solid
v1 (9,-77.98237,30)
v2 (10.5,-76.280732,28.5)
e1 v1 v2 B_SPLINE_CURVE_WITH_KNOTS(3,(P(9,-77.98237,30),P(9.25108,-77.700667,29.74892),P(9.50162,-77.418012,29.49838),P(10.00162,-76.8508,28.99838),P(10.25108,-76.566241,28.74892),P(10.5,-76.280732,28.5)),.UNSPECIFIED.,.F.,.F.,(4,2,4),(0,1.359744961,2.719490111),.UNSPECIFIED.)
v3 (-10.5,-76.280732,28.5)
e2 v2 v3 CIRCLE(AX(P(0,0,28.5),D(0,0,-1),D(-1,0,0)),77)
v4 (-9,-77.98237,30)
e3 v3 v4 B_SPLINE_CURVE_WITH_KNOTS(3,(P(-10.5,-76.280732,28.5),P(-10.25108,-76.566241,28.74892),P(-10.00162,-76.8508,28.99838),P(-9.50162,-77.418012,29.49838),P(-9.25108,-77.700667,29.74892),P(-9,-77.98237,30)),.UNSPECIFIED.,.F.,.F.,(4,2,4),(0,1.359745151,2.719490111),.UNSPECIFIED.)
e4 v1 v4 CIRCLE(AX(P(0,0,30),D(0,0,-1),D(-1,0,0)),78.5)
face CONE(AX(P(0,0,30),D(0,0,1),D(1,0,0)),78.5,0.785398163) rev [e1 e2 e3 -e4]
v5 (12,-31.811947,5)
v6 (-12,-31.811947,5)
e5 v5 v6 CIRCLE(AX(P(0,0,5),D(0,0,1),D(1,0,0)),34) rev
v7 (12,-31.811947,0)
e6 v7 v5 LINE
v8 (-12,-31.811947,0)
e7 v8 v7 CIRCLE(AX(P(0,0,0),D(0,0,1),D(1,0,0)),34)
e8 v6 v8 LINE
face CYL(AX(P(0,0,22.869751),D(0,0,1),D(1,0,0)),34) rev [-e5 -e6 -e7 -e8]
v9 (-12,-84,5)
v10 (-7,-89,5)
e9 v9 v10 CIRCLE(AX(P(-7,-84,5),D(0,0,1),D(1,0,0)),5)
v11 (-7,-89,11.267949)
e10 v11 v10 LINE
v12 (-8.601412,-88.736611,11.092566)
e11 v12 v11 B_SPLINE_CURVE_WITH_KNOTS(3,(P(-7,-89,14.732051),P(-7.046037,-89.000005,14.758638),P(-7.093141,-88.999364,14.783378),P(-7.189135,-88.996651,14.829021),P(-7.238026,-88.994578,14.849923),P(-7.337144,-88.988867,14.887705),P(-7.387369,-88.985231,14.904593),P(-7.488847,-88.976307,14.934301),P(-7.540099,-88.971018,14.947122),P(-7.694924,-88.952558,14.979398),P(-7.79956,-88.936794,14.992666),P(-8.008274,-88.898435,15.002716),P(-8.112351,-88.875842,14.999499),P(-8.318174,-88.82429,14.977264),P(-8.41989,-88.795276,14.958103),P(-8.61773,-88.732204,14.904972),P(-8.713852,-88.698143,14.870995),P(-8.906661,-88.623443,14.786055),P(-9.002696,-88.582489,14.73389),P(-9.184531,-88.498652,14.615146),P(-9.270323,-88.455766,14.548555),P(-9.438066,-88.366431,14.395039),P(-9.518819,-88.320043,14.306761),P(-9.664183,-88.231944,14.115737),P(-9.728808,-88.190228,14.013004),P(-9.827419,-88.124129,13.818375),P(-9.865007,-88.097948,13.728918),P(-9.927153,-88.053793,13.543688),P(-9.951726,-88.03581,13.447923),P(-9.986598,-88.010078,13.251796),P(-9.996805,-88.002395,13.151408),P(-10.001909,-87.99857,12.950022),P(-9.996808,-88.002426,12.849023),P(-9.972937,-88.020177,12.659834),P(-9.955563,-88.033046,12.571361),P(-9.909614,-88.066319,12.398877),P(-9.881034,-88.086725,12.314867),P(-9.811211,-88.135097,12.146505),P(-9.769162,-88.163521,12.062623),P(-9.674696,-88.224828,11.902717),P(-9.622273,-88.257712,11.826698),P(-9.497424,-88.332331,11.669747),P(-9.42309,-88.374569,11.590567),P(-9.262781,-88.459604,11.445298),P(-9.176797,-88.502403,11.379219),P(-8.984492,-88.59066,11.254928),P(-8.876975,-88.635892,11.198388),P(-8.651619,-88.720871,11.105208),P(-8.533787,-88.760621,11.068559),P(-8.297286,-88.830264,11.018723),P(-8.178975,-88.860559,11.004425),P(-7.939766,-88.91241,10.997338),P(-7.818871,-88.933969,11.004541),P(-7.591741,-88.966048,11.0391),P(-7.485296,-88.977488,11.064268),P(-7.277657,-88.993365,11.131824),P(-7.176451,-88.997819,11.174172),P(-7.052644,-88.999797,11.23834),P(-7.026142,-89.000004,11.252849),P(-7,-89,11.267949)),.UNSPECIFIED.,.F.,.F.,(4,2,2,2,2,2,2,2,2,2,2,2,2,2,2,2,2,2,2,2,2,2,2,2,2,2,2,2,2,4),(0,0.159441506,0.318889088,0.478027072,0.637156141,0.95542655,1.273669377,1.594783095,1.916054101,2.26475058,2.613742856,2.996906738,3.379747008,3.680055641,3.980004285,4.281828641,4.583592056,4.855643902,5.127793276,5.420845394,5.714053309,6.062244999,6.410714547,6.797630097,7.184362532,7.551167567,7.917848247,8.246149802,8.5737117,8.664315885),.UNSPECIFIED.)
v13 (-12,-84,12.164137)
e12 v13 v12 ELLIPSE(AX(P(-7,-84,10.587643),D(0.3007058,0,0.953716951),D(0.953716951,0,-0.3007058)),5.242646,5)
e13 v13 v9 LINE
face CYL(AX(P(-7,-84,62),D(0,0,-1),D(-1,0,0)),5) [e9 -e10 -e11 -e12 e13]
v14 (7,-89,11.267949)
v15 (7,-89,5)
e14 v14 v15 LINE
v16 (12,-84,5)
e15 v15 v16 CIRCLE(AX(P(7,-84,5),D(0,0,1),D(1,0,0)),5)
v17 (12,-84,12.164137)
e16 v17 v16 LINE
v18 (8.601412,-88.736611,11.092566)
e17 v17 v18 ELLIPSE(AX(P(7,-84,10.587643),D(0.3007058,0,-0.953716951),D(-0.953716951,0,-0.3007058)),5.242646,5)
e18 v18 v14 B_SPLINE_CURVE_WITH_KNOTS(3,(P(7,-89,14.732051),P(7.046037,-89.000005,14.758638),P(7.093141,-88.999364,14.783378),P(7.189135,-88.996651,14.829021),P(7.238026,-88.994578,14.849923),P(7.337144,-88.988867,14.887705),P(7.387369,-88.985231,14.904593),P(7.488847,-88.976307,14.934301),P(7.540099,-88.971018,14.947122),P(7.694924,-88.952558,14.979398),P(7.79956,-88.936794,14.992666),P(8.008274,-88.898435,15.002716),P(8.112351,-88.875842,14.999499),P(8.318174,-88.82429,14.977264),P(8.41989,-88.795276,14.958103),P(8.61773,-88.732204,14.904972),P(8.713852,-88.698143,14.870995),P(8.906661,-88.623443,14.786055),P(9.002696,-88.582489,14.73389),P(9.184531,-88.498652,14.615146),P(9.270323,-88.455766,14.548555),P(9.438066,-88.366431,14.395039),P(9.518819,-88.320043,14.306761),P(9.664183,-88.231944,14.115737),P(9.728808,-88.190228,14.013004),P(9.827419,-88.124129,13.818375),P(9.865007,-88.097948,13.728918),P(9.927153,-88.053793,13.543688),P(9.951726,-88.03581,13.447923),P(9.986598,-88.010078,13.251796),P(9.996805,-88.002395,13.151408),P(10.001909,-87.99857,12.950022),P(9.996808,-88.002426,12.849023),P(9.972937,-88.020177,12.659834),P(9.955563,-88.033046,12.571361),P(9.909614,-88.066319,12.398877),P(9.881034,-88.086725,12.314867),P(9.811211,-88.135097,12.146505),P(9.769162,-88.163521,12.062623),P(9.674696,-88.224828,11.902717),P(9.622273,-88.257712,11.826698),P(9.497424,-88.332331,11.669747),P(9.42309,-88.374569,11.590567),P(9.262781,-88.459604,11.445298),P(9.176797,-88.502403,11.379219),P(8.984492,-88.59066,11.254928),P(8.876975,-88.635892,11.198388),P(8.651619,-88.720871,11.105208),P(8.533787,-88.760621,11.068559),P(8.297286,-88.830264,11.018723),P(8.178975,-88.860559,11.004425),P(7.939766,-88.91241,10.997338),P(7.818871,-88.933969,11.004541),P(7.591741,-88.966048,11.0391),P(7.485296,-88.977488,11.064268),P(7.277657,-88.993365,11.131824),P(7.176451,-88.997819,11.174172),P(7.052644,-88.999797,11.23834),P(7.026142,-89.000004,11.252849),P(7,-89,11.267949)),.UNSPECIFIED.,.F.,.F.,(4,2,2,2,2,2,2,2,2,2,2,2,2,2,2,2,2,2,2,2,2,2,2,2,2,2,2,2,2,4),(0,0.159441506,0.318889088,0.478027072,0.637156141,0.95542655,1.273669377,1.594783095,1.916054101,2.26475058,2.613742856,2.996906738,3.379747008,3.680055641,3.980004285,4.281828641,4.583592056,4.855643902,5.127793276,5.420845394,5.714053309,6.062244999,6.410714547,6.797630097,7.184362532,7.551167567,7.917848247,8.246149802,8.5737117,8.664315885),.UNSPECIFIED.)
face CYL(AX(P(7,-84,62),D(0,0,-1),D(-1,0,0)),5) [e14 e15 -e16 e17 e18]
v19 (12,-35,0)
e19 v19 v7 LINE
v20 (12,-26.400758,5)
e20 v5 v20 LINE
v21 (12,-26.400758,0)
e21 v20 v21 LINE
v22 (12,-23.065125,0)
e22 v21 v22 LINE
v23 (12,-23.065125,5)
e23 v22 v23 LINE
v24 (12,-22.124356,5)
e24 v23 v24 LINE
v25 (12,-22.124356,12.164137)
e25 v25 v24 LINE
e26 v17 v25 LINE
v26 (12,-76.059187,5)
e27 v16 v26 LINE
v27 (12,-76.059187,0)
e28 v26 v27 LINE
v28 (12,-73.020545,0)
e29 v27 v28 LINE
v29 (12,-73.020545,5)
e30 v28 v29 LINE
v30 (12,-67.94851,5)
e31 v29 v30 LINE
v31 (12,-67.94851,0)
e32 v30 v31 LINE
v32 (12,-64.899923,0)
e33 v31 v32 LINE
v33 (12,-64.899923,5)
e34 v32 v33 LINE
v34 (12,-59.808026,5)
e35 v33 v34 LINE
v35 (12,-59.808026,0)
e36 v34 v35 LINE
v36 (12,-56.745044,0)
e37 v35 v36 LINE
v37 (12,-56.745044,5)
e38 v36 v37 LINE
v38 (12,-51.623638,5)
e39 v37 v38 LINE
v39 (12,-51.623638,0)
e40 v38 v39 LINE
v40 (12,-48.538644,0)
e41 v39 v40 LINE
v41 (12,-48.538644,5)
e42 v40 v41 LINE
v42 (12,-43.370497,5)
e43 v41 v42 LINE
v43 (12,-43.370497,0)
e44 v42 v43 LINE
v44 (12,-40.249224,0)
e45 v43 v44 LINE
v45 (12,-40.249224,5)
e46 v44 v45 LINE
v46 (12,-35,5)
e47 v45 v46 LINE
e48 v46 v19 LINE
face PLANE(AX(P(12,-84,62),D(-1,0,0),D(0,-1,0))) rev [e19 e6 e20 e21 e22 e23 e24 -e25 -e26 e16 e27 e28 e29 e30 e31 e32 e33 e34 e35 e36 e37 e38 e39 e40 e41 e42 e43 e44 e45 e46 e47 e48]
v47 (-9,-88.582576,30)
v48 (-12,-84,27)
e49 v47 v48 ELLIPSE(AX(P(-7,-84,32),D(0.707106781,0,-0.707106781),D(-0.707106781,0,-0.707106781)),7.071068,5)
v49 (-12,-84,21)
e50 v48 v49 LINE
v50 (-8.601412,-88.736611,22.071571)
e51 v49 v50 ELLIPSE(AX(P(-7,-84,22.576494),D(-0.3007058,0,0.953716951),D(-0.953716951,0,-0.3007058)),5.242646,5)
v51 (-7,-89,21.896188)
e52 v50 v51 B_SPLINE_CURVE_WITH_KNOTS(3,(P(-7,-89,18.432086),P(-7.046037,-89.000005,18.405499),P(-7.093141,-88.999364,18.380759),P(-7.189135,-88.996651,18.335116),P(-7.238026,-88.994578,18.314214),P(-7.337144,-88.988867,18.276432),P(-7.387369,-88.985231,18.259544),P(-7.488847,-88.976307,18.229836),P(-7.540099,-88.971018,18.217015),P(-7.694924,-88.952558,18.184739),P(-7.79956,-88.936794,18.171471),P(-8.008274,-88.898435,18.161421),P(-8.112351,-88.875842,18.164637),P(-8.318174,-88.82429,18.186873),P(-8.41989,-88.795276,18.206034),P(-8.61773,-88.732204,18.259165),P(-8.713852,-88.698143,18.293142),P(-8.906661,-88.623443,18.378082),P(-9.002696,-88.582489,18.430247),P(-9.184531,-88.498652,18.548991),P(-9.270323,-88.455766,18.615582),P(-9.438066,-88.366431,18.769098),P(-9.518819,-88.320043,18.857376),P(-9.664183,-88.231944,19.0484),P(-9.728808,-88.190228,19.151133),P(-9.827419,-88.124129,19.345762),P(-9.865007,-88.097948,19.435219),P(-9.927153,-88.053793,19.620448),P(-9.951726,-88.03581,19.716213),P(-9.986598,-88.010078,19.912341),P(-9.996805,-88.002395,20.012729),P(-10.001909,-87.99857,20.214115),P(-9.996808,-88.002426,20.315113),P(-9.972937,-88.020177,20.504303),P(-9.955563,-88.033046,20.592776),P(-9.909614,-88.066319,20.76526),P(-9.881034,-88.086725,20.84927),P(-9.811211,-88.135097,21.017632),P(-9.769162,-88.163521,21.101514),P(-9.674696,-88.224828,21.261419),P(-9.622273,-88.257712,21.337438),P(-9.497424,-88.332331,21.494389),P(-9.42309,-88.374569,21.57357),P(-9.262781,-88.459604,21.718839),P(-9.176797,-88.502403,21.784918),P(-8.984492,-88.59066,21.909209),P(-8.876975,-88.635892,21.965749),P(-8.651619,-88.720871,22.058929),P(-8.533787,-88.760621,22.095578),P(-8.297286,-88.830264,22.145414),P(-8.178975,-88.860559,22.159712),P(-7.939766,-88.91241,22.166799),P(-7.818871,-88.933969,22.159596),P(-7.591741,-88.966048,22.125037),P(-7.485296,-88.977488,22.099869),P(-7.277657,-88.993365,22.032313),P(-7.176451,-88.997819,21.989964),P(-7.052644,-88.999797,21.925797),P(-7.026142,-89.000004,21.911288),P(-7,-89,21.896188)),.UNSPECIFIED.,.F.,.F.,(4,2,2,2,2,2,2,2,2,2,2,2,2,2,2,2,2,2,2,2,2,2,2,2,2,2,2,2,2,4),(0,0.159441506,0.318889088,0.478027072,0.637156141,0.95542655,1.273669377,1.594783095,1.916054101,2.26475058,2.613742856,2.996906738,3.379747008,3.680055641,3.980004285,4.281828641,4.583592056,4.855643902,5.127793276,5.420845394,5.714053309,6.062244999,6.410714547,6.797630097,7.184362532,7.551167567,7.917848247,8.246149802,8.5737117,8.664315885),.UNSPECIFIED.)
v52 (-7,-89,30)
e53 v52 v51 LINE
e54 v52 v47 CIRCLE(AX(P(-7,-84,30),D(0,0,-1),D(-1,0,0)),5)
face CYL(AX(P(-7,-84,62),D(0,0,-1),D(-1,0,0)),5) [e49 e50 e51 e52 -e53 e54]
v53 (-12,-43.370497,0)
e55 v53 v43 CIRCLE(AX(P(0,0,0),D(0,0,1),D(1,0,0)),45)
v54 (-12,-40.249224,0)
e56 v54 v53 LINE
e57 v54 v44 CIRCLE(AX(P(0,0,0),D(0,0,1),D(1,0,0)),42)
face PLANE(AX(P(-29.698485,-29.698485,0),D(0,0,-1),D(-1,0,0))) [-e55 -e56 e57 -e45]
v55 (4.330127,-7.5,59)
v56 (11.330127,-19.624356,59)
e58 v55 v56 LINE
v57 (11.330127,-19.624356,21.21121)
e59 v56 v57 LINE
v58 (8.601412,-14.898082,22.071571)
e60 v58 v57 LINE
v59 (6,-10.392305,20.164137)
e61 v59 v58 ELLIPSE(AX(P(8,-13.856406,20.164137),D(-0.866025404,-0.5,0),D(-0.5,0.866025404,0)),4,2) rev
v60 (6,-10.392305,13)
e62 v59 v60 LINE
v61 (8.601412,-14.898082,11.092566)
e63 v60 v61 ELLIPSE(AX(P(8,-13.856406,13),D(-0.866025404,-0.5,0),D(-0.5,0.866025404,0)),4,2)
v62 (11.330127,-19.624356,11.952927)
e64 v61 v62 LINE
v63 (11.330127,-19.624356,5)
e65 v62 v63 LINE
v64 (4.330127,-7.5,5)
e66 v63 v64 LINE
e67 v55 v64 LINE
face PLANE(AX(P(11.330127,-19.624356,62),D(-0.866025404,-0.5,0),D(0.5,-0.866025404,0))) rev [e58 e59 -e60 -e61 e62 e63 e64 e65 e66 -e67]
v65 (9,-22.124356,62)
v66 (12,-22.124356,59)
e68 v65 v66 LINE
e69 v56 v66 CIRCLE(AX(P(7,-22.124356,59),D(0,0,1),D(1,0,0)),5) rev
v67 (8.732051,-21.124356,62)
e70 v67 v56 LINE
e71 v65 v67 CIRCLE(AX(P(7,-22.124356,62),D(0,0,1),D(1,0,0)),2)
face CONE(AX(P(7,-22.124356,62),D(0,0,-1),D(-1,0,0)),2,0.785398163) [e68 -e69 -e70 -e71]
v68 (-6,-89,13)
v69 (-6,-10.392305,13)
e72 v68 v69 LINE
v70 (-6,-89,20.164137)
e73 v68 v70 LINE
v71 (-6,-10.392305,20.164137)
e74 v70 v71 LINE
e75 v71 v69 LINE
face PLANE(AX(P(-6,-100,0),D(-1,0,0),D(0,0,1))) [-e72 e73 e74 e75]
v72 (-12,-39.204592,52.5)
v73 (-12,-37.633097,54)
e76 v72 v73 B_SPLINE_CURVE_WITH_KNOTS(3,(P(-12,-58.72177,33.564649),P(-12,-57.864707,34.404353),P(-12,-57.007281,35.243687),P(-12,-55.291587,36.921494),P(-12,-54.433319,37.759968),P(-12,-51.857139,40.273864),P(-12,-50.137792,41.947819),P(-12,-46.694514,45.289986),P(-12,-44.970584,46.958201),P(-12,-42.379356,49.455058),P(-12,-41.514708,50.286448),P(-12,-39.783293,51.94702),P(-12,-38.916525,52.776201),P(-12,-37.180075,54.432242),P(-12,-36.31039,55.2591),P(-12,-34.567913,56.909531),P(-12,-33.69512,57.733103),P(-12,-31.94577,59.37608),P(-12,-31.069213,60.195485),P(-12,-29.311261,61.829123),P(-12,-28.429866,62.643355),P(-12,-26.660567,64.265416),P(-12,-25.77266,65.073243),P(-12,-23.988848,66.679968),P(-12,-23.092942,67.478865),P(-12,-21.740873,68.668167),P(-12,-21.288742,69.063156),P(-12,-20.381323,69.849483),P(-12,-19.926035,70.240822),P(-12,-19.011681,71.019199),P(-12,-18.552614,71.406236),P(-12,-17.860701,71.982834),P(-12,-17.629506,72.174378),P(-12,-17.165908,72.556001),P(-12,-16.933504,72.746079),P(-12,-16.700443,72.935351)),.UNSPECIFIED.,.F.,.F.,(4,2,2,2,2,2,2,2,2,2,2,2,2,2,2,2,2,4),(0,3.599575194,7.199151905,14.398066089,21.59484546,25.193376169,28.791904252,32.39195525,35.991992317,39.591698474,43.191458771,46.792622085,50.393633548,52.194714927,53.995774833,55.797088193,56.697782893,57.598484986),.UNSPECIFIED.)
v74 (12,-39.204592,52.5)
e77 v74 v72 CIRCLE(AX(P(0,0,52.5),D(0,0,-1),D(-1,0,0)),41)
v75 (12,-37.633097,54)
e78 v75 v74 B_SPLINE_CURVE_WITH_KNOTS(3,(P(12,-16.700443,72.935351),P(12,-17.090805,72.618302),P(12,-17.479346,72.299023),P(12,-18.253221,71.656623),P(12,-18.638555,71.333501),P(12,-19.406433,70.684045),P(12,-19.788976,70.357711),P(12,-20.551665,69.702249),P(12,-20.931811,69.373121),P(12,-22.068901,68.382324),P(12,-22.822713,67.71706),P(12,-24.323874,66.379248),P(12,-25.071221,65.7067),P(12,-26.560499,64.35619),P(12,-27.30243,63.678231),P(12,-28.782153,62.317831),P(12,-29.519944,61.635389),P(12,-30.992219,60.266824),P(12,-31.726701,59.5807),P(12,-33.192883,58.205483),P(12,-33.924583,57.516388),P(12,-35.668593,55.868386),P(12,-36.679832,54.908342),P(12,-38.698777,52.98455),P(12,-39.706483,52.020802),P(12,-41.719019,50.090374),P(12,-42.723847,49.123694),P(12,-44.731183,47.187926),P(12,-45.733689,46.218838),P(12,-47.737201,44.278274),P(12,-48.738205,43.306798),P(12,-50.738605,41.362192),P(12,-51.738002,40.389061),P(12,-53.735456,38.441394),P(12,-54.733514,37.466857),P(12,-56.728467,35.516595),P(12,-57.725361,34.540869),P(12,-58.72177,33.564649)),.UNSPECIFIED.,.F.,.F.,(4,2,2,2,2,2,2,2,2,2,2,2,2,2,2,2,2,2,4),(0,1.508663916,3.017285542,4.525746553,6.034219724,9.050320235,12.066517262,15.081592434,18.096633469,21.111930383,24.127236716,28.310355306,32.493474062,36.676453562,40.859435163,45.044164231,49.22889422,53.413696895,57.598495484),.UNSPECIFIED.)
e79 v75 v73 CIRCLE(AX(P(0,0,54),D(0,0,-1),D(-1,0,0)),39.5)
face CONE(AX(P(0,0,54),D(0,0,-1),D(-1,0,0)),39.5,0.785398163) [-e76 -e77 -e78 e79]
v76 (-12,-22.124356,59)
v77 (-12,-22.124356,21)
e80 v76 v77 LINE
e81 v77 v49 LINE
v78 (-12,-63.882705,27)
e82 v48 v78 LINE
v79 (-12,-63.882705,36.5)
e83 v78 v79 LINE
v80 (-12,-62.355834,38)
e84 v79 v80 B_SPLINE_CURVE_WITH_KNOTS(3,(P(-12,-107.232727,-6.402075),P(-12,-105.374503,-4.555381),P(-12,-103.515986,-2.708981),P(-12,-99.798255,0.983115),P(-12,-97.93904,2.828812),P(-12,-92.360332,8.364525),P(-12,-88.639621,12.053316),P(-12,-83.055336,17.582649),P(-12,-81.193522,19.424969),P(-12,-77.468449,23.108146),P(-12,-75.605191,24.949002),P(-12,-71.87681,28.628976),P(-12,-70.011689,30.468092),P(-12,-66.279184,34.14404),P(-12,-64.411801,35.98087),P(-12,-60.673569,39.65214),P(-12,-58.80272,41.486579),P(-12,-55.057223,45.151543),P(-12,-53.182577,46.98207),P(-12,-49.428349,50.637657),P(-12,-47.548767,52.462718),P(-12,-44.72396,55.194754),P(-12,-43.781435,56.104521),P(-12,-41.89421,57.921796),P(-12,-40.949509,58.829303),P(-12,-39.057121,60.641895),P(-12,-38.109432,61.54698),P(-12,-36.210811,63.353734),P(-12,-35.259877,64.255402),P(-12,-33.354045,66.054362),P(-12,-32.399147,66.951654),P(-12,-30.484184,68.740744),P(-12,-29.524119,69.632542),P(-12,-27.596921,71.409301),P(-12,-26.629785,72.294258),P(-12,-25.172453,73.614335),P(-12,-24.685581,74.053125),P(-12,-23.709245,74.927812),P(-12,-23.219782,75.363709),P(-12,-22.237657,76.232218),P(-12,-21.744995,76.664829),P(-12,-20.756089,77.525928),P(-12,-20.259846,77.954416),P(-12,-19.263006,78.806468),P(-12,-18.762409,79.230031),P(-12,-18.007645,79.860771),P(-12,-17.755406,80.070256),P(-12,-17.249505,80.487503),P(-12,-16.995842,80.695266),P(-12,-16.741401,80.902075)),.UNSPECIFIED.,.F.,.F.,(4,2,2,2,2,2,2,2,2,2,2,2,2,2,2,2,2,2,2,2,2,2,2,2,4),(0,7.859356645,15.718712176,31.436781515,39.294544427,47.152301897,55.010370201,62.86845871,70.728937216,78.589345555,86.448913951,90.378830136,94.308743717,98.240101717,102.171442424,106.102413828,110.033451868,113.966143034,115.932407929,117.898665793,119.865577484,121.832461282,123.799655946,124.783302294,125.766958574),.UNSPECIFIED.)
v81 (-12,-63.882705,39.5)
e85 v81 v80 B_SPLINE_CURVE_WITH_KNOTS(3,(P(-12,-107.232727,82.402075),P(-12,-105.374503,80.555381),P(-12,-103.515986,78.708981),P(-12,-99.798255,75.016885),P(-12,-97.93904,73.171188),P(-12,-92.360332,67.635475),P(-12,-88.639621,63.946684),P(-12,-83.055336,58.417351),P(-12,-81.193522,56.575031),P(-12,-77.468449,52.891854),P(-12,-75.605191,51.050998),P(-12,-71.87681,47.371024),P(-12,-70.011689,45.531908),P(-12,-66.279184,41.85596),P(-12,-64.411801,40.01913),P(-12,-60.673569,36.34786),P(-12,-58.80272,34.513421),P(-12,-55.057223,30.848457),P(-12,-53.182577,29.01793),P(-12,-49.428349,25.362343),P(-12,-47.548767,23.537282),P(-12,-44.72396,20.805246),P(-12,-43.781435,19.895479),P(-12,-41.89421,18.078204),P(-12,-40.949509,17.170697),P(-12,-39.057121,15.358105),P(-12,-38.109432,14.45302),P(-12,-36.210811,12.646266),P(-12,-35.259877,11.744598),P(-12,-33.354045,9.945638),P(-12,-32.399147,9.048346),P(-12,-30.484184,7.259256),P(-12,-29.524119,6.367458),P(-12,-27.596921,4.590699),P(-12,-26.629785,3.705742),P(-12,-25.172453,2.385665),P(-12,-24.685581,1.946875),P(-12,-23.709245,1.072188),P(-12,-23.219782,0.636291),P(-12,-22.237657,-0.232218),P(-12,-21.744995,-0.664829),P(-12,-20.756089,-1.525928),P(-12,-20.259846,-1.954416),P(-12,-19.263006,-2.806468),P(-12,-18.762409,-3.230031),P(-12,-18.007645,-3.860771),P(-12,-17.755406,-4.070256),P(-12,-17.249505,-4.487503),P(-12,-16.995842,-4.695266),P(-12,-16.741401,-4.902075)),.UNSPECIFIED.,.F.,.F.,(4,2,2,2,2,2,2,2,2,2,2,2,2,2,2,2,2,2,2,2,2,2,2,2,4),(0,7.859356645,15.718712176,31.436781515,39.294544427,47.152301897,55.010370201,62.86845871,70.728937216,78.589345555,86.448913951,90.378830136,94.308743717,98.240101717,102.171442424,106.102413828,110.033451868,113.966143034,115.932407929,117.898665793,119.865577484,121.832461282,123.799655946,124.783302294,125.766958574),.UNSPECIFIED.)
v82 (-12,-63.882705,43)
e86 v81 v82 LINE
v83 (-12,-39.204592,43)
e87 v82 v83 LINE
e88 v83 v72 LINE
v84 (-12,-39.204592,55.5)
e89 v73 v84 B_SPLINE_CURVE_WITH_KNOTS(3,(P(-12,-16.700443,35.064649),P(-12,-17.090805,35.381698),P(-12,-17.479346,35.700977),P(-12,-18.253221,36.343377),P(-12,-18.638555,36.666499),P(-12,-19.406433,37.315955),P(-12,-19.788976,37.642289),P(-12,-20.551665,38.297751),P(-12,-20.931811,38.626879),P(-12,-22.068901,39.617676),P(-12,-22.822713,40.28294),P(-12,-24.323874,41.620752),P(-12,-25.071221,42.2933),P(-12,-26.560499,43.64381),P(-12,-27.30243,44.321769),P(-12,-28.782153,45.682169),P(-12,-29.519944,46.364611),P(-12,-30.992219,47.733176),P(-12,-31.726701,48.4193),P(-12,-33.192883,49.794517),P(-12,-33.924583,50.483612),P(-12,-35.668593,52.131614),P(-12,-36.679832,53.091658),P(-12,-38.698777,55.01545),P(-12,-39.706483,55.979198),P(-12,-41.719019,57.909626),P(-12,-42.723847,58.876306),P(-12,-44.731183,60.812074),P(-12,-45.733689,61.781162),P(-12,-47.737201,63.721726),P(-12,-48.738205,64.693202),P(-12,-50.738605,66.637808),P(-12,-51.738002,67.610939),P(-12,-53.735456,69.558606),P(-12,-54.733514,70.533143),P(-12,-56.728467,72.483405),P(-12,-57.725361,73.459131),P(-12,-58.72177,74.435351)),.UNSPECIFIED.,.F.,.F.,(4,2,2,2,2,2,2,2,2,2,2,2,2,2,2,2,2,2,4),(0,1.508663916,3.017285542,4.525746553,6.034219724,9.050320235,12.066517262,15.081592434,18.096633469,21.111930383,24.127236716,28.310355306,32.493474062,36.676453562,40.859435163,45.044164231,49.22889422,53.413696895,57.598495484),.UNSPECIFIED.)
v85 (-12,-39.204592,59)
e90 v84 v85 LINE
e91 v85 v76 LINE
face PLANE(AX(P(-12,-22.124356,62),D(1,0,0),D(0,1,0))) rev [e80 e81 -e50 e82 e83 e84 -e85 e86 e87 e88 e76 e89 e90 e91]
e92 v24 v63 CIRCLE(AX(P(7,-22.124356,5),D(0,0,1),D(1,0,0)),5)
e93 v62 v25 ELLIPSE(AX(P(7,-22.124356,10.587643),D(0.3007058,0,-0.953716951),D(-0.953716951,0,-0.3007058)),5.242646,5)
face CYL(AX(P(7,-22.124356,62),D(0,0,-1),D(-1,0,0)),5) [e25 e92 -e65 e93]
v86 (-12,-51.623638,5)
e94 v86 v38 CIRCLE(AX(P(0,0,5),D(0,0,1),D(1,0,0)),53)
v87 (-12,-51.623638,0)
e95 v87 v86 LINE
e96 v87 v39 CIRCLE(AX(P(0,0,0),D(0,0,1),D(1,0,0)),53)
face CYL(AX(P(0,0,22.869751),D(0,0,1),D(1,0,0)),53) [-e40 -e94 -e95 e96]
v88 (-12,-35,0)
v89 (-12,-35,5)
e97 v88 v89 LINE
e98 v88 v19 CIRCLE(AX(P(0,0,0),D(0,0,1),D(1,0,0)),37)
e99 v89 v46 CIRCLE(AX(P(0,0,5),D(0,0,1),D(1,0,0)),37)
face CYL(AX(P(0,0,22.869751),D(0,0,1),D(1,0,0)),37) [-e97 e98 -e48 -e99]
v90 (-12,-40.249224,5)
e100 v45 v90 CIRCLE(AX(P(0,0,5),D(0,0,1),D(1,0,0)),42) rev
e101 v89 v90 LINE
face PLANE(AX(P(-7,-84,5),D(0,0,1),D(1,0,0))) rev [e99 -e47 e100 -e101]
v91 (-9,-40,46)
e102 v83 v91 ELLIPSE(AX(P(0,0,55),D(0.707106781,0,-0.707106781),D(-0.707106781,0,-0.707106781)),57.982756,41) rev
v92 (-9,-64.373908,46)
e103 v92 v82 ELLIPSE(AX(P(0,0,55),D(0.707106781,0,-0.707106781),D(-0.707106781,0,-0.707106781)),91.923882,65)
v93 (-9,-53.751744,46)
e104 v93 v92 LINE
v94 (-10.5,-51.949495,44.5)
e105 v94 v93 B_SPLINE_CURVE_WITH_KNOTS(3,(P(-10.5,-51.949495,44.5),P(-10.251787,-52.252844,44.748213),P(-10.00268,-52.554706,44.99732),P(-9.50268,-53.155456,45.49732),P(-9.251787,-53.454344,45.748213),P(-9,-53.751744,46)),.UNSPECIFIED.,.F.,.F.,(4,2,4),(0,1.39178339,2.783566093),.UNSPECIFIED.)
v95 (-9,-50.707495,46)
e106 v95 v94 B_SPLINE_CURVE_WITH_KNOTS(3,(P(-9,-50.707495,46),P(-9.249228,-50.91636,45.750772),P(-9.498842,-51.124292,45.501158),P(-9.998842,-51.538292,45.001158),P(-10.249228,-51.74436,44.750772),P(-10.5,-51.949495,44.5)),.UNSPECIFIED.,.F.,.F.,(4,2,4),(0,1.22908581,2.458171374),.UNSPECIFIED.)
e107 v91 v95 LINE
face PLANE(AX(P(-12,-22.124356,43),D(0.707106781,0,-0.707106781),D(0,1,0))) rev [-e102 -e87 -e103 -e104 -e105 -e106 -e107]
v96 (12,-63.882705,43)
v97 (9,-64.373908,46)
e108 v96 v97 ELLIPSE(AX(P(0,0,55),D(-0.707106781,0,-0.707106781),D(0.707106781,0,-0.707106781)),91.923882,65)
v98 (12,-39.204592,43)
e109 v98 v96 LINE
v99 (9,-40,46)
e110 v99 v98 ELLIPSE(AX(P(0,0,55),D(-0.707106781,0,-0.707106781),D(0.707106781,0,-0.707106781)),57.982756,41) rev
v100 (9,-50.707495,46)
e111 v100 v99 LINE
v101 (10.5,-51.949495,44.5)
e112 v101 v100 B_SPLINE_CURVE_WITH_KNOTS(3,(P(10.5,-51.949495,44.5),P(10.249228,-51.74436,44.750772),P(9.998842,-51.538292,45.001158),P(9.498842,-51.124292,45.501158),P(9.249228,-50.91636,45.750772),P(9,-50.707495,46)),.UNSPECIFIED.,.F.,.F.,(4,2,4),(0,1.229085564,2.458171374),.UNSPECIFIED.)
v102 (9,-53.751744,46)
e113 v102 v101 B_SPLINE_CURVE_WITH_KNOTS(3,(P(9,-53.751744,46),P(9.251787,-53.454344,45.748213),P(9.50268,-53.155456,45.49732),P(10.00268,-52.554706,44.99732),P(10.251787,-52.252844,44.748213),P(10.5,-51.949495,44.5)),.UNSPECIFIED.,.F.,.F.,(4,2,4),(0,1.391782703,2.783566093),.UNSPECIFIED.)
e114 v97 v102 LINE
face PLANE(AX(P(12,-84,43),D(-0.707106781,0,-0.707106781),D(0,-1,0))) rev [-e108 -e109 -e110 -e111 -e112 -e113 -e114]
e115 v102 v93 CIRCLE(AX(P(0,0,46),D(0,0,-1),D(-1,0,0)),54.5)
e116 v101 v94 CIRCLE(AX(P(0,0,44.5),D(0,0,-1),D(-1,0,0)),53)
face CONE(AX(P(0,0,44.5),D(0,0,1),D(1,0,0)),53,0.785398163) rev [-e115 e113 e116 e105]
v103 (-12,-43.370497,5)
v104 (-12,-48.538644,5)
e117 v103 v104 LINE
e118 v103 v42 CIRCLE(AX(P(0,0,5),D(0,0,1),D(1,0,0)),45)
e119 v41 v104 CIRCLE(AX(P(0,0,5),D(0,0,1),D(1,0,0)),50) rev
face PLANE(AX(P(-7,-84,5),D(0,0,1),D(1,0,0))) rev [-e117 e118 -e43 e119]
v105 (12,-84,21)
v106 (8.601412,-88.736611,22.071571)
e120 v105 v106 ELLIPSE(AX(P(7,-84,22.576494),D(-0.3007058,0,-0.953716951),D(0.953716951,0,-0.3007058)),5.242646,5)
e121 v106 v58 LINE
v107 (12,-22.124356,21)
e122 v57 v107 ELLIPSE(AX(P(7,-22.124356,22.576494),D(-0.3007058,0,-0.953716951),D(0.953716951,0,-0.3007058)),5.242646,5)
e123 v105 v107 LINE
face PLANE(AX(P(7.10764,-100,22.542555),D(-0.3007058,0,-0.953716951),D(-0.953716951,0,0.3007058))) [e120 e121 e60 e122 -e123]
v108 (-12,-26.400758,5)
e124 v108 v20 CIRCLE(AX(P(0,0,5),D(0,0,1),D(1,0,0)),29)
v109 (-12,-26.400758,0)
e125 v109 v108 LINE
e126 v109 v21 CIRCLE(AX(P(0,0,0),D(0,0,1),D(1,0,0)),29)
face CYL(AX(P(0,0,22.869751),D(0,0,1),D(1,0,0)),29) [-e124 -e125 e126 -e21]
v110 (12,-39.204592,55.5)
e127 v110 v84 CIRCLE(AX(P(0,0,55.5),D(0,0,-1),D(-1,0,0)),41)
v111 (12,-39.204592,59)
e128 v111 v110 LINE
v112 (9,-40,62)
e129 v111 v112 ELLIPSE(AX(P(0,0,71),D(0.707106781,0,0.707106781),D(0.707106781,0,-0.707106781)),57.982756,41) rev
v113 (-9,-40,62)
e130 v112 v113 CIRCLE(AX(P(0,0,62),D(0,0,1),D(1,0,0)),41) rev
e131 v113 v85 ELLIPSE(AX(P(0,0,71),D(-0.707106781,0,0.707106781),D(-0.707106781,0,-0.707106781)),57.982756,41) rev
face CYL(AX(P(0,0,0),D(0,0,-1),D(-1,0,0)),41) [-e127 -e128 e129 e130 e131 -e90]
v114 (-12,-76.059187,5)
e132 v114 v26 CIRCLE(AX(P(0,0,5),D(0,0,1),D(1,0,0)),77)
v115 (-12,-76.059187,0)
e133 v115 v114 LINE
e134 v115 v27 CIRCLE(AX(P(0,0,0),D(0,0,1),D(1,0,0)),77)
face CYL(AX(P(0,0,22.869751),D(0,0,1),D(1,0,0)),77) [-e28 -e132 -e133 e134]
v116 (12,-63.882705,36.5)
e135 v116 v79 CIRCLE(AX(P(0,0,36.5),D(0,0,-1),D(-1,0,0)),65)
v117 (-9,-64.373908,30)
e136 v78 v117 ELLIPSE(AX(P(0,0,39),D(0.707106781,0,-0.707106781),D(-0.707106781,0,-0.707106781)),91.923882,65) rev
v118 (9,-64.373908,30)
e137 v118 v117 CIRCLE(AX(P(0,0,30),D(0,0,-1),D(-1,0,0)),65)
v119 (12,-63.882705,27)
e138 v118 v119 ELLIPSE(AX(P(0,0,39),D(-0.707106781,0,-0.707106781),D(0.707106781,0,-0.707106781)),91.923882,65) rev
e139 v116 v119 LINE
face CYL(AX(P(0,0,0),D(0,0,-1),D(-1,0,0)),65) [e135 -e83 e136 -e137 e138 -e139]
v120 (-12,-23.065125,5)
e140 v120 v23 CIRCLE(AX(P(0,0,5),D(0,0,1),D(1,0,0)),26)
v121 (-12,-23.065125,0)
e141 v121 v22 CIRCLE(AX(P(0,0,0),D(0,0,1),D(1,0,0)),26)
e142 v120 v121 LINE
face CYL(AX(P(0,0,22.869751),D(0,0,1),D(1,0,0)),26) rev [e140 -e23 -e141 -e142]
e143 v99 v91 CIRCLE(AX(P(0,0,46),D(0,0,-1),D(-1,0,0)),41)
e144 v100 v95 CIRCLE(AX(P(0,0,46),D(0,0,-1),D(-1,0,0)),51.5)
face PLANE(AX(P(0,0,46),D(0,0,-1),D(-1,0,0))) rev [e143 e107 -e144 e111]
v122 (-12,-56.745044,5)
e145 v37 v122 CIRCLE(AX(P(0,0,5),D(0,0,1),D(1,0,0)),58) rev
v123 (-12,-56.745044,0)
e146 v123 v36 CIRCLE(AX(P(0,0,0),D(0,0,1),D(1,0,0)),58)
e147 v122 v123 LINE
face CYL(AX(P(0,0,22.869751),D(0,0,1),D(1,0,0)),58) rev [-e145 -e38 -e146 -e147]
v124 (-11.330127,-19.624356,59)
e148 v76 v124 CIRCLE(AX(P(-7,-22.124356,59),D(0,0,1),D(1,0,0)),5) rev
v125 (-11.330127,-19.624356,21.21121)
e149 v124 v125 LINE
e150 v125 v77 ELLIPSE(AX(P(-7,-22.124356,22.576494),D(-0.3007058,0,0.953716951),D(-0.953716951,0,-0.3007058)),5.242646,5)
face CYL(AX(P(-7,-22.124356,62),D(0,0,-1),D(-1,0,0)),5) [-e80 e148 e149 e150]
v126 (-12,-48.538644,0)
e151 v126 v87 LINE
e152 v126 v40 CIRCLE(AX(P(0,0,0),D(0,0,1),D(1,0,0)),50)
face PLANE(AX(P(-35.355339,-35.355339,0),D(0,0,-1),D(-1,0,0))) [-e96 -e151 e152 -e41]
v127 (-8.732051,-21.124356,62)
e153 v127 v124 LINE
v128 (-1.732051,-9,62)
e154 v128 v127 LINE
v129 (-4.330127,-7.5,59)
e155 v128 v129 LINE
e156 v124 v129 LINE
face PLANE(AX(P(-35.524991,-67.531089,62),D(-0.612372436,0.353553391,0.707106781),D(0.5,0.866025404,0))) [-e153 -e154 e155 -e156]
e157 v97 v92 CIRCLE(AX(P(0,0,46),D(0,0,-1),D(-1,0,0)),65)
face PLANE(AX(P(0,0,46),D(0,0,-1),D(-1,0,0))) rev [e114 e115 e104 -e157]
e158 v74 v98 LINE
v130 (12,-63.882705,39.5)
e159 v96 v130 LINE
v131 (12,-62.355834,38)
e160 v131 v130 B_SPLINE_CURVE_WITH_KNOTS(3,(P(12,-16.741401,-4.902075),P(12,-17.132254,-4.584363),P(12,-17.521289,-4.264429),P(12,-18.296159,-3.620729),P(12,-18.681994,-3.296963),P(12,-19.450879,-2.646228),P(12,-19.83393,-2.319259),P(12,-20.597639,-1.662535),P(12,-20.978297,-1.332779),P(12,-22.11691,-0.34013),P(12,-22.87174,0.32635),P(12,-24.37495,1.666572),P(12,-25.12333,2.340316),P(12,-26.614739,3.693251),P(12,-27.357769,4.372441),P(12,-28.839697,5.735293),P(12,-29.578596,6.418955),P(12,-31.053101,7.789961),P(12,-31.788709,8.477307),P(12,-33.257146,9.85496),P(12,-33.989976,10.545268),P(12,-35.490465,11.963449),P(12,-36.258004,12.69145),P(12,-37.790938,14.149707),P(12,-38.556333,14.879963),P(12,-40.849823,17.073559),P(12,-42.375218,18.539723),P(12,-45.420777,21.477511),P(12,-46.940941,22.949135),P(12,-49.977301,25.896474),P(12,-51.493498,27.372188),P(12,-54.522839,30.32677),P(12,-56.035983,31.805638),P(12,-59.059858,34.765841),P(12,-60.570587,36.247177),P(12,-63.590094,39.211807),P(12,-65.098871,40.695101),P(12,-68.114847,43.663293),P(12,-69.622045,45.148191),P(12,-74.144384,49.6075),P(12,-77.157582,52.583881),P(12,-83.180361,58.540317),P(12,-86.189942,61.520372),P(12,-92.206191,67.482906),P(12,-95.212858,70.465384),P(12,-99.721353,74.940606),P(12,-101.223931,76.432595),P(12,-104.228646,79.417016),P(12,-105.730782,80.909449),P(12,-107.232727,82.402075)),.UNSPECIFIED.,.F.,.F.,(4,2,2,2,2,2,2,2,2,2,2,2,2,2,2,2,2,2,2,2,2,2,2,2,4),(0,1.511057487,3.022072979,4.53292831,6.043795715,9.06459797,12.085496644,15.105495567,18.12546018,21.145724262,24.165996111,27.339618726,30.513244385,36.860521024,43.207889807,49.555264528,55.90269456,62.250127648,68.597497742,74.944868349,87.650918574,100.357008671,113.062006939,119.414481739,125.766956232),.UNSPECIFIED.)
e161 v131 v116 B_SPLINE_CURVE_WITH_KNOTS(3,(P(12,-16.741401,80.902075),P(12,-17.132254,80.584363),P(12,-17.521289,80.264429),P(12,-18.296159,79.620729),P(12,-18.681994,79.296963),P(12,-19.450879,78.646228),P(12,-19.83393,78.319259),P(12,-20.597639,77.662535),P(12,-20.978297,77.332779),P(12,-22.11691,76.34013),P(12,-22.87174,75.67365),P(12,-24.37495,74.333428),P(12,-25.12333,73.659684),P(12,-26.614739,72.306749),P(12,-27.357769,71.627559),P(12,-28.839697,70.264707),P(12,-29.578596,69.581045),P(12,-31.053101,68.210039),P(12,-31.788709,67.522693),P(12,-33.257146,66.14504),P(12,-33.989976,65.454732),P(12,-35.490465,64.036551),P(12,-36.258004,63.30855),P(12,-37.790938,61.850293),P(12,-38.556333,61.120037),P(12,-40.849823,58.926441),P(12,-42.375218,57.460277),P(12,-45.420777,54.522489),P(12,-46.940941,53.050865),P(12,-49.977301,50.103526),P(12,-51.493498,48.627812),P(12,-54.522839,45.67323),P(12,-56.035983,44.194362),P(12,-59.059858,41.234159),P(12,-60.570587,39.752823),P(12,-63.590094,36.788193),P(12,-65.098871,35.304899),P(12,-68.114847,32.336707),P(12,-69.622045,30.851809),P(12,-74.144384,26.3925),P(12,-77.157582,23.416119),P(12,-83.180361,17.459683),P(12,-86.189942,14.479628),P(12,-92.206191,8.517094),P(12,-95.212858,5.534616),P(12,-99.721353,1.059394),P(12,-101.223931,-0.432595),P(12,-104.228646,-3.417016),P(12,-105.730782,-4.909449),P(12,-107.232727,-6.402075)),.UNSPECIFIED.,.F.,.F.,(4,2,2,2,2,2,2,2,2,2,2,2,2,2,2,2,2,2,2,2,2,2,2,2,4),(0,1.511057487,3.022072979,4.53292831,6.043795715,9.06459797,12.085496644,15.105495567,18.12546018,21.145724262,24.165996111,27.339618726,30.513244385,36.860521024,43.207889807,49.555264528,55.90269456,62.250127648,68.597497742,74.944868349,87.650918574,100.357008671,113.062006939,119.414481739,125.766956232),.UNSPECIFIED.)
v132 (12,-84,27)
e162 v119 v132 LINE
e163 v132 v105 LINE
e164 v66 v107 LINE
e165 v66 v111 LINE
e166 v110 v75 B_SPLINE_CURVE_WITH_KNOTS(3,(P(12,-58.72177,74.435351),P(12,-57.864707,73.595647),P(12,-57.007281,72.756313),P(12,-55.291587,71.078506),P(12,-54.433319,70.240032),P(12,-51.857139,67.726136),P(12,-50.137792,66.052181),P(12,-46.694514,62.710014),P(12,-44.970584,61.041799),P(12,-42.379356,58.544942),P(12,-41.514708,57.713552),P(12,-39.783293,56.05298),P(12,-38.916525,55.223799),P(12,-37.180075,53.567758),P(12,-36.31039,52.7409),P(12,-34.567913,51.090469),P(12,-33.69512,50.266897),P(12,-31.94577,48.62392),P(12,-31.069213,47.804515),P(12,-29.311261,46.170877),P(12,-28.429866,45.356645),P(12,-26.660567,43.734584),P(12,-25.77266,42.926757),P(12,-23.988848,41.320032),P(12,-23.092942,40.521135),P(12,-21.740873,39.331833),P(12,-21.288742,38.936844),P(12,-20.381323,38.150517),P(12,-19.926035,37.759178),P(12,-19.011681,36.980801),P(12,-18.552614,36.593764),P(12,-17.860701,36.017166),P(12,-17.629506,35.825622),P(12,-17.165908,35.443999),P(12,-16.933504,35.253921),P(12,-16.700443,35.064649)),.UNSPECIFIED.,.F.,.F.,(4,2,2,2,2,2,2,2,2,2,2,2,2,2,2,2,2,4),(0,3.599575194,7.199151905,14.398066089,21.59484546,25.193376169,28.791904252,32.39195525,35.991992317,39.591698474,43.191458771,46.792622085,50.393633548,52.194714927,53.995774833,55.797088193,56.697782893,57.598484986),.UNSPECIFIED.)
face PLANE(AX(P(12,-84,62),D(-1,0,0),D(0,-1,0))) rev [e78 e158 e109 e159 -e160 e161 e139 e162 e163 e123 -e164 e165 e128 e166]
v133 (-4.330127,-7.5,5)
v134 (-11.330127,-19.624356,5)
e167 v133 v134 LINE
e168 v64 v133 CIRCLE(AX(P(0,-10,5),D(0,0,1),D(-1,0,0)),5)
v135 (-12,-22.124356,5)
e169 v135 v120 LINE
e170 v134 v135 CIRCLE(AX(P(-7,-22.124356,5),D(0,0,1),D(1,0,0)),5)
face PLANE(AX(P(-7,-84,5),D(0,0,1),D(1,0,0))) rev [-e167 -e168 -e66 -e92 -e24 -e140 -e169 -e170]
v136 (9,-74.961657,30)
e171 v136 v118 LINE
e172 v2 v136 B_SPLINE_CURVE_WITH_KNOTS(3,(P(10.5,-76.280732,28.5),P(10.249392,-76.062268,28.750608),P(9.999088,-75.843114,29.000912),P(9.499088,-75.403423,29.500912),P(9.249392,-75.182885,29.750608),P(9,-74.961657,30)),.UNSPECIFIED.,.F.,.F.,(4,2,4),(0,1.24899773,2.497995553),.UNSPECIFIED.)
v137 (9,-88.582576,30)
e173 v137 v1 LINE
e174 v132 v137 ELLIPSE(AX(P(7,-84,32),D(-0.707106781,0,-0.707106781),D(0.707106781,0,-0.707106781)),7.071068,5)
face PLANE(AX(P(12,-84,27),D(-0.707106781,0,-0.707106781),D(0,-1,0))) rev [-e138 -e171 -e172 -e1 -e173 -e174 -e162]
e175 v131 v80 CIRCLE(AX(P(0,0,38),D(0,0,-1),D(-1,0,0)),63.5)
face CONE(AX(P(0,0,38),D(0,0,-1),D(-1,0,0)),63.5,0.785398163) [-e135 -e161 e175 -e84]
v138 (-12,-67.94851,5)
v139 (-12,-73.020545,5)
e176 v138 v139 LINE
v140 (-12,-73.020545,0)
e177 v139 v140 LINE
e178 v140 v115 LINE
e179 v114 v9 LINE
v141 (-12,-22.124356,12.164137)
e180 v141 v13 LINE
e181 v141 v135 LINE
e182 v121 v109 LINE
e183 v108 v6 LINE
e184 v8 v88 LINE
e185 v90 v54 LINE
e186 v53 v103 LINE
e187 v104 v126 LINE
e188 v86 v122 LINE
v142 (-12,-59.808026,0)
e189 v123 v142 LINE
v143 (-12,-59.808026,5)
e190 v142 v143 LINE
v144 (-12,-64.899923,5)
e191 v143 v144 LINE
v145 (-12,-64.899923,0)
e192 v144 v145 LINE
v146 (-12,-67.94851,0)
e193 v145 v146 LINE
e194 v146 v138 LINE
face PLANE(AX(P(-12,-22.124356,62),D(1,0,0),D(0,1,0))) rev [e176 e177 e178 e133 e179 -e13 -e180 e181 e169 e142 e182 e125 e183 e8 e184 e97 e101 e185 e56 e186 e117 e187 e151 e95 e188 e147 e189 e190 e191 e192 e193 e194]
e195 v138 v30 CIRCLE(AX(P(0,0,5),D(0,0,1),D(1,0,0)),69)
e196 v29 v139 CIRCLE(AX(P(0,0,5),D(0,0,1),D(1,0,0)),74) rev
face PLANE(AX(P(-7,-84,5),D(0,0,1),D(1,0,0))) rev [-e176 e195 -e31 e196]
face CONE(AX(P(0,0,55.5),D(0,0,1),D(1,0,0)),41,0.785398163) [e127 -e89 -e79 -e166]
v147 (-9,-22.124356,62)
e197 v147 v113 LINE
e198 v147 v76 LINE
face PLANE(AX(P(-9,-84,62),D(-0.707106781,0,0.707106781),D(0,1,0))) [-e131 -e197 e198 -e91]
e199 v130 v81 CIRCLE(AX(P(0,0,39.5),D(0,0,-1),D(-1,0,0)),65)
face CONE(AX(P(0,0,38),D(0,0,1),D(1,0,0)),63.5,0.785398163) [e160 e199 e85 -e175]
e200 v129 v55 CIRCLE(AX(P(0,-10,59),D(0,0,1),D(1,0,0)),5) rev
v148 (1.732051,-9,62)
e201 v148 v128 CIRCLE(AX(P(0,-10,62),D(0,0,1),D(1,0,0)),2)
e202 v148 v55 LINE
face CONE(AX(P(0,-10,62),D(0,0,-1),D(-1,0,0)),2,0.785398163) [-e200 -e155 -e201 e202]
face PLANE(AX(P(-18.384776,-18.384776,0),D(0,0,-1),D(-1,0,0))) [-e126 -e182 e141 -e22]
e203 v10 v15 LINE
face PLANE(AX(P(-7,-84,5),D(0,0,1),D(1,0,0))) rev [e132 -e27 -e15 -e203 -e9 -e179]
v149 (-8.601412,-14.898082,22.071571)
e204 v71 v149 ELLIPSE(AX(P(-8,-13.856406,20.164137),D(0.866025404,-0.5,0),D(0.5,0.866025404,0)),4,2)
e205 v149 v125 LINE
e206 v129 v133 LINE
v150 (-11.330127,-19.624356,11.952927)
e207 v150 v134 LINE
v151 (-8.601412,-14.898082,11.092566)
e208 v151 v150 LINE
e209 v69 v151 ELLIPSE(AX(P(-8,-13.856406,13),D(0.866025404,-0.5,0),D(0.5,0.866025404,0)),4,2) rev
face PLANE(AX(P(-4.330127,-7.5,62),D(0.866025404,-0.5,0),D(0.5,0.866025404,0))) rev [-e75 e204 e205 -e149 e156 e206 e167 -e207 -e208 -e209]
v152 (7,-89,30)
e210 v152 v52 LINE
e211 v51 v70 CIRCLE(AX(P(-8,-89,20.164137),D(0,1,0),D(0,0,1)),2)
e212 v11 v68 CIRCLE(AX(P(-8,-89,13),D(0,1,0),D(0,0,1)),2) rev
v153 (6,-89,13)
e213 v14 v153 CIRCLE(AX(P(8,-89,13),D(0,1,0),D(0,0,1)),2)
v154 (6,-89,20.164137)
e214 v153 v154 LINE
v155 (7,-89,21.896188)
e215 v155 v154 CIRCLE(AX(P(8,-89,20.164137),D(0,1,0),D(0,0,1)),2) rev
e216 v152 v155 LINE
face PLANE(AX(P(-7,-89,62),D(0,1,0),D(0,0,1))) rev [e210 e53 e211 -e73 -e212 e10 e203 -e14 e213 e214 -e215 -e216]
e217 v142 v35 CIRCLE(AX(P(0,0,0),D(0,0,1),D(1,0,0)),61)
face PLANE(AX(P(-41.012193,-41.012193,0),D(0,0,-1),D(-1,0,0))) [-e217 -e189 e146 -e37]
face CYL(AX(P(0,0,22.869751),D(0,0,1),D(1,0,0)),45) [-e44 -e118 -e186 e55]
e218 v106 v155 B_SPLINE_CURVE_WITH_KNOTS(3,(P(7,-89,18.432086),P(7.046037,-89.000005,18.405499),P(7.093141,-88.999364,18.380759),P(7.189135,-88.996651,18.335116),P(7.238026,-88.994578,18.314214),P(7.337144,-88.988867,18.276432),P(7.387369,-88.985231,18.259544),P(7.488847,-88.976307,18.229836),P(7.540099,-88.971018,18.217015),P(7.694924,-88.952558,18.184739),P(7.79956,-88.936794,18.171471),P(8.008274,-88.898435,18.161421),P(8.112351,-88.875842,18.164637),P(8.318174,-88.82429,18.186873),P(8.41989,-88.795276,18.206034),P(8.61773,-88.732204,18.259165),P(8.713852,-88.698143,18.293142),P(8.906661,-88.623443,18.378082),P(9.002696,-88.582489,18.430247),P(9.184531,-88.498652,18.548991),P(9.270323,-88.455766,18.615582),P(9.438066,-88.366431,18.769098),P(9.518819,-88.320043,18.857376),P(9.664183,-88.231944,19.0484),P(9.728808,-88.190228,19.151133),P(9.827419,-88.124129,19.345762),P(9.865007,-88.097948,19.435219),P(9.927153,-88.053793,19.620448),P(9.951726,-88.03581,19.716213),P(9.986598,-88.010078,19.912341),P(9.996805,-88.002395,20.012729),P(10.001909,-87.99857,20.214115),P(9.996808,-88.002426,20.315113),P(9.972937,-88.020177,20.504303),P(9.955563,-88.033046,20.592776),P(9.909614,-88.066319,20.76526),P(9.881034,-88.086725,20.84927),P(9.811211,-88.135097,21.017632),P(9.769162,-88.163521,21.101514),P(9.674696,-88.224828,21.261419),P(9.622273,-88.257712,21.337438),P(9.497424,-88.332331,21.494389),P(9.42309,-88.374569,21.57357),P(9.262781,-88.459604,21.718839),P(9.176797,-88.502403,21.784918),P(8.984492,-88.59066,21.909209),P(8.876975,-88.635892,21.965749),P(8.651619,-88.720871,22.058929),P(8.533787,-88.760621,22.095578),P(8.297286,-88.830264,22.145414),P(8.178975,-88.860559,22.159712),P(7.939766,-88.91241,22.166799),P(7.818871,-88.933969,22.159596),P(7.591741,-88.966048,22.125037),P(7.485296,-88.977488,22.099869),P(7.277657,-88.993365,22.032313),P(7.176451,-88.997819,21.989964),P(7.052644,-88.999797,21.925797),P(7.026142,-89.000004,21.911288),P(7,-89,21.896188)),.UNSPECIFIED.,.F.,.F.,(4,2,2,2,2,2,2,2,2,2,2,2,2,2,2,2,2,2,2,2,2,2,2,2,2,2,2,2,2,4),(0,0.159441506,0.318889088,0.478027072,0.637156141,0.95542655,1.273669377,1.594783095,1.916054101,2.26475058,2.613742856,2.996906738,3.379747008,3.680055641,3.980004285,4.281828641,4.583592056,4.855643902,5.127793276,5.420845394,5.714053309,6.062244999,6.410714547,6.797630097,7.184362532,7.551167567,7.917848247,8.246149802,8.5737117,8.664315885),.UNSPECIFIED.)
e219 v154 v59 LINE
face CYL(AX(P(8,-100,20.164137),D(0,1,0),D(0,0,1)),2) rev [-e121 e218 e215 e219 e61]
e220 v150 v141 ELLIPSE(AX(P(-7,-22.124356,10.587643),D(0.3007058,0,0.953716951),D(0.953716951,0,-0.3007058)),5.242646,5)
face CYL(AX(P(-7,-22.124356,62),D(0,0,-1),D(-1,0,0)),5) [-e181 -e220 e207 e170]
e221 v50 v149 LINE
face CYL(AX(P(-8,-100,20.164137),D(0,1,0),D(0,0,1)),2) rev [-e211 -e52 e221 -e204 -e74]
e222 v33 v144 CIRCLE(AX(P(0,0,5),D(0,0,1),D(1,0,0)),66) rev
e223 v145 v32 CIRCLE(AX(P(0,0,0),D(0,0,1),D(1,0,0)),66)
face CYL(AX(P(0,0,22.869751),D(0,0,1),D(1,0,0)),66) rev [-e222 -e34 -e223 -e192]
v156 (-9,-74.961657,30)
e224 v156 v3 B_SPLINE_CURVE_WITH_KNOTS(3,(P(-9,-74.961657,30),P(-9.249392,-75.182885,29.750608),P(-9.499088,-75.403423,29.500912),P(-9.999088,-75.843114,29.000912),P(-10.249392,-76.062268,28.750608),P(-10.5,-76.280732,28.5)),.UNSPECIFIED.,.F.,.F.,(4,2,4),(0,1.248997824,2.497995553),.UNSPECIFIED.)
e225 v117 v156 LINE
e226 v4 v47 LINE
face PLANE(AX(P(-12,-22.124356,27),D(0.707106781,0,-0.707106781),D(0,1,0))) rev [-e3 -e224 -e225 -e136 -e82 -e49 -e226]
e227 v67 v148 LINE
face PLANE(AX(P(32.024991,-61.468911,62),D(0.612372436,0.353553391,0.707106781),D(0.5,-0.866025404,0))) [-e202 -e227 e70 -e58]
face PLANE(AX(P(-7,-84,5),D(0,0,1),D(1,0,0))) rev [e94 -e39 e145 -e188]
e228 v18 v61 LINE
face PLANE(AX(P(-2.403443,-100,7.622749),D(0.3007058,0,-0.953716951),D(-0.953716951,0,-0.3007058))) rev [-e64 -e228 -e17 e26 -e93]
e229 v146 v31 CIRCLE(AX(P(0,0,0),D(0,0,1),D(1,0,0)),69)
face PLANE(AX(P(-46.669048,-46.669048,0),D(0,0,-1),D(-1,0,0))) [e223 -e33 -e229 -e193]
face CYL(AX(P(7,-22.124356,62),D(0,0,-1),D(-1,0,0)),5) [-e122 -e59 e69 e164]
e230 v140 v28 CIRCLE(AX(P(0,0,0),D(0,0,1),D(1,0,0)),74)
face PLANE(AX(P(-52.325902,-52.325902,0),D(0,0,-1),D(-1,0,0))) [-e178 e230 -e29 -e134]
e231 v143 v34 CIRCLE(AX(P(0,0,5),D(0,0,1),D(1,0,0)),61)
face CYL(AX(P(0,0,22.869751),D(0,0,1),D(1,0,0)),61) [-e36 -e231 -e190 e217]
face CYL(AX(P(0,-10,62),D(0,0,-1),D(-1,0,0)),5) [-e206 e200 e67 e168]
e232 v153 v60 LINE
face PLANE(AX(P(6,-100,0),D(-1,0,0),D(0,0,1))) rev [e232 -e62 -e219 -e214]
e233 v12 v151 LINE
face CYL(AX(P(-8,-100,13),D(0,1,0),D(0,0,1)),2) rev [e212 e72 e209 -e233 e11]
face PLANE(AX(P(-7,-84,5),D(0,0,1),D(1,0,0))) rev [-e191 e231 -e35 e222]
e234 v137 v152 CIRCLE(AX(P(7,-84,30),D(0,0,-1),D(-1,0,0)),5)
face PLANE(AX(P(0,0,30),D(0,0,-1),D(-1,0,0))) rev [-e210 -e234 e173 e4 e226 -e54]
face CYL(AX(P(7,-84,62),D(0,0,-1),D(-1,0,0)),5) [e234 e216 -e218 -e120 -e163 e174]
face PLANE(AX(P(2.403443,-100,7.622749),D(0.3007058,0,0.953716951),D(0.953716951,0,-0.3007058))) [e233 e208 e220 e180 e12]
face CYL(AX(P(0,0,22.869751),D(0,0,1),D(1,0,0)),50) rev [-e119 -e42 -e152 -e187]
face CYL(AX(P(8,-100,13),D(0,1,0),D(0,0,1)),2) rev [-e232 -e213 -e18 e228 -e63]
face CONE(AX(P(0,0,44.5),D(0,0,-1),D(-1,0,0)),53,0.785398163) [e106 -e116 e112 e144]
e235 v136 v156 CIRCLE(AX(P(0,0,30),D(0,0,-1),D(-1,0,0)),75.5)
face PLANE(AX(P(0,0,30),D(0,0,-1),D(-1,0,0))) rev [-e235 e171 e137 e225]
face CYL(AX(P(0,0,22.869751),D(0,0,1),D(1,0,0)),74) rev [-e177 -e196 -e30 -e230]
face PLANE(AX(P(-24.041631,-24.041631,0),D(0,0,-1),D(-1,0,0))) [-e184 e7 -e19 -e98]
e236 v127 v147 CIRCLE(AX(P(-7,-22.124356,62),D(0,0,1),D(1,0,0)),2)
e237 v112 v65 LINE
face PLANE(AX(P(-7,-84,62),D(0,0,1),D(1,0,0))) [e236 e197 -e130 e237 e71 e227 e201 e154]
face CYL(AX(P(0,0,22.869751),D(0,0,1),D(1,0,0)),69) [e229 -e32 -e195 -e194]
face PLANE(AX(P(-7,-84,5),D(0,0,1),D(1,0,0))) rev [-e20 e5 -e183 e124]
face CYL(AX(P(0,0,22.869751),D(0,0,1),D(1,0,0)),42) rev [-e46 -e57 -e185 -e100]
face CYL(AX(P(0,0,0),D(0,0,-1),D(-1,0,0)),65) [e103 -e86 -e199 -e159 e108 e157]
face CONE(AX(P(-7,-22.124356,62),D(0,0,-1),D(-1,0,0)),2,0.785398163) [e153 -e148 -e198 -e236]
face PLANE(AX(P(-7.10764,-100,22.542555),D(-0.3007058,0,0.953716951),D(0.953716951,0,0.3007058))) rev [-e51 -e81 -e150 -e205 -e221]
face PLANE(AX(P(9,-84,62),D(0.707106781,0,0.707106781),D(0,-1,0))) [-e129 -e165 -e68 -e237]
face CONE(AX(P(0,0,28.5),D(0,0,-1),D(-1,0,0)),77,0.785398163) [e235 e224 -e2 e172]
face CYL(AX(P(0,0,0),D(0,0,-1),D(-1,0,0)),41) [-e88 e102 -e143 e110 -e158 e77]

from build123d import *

# Parameters (mm, degrees)
BOSS_EXTRUDE1_START = 5
BOSS_EXTRUDE1_DEPTH = 57
SKETCH8_W           = 5
SKETCH8_H           = 3
REVOLVE1_ANGLE      = 90
SKETCH9_W           = 63.56376225
SKETCH9_H           = 92.375008695
SKETCH9_W_2         = 66.279802766
SKETCH9_H_2         = 103.815770587
CUT_EXTRUDE2_DEPTH  = 100
CUT_EXTRUDE3_DEPTH  = 100
CHAMFER4_SIZE       = 3
CHAMFER5_SIZE       = 3
CHAMFER7_SIZE       = 3
CHAMFER10_SIZE      = 3


with BuildPart() as part:
    # Sketch1 → Boss-Extrude1 (new body)
    with BuildSketch(Plane.XY.offset(BOSS_EXTRUDE1_START)):
        with BuildLine():
            Line((-4.330127019, -7.5), (-11.330127019, -19.624355653))
            ThreePointArc((-11.330127019, -19.624355653), (-11.829629131, -20.830260427), (-12, -22.124355653))
            Line((-12, -22.124355653), (-12, -84))
            ThreePointArc((-12, -84), (-10.535533906, -87.535533906), (-7, -89))
            Line((-7, -89), (7, -89))
            ThreePointArc((7, -89), (10.535533906, -87.535533906), (12, -84))
            Line((12, -84), (12, -22.124355653))
            ThreePointArc((12, -22.124355653), (11.829629131, -20.830260427), (11.330127019, -19.624355653))
            Line((11.330127019, -19.624355653), (4.330127019, -7.5))
            ThreePointArc((4.330127019, -7.5), (0, -5), (-4.330127019, -7.5))
        make_face()
    extrude(amount=BOSS_EXTRUDE1_DEPTH)

    # Sketch7 → Cut-Revolve2 (revolve, cut)
    with BuildSketch(Plane(origin=(0, 0, 0), x_dir=(0, 0, -1), z_dir=(1, 0, 0))):
        Polygon((-73.391777599, -41), (-62, -41), (-46, -41), (-46, -65), (-30, -65), (-30, -89), (-30, -99.200268773), (-73.391777599, -99.200268773), align=None)
        Polygon((-28.5, -77), (-30, -75.5), (-30, -78.5), align=None)
        Polygon((-38, -63.5), (-36.5, -65), (-39.5, -65), align=None)
        Polygon((-44.5, -53), (-46, -54.5), (-46, -51.5), align=None)
        Polygon((-54, -39.5), (-52.5, -41), (-55.5, -41), align=None)
    revolve(axis=Axis((0, 0, 0), (0, 0, 1)), mode=Mode.SUBTRACT)

    # Sketch8 → Revolve1 (revolve, symmetric)
    with BuildSketch(Plane(origin=(0, 0, 0), x_dir=(0, 0, -1), z_dir=(1, 0, 0))) as revolve1_sk:
        with Locations((-2.5, -35.5)):
            Rectangle(SKETCH8_W, SKETCH8_H)
        with Locations((-2.5, -27.5)):
            Rectangle(SKETCH8_W, SKETCH8_H)
        with Locations((-2.5, -43.5)):
            Rectangle(SKETCH8_W, SKETCH8_H)
        with Locations((-2.5, -51.5)):
            Rectangle(SKETCH8_W, SKETCH8_H)
        with Locations((-2.5, -59.5)):
            Rectangle(SKETCH8_W, SKETCH8_H)
        with Locations((-2.5, -67.5)):
            Rectangle(SKETCH8_W, SKETCH8_H)
        with Locations((-2.5, -75.5)):
            Rectangle(SKETCH8_W, SKETCH8_H)
    revolve(axis=Axis((0, 0, 22.869751467), (0, 0, -1)), revolution_arc=REVOLVE1_ANGLE / 2)
    revolve(revolve1_sk.sketch, axis=Axis((0, 0, 22.869751467), (0, 0, 1)), revolution_arc=REVOLVE1_ANGLE / 2)

    # Sketch9 → Cut-Extrude2 (cut)
    with BuildSketch(Plane(origin=(0, 0, 0), x_dir=(1, 0, 0), z_dir=(0, 1, 0))):
        with Locations((-43.781881125, -28.783671007)):
            Rectangle(SKETCH9_W, SKETCH9_H)
        with Locations((45.139901383, -26.868725236)):
            Rectangle(SKETCH9_W_2, SKETCH9_H_2)
    extrude(amount=-CUT_EXTRUDE2_DEPTH, mode=Mode.SUBTRACT)

    # Sketch10 → Cut-Extrude3 (cut)
    with BuildSketch(Plane(origin=(0, 0, 0), x_dir=(1, 0, 0), z_dir=(0, 1, 0))):
        with BuildLine():
            Line((12, -21), (12, -20.164136905))
            Line((12, -20.164136905), (12, -13))
            Line((12, -13), (12, -12.164136905))
            Line((12, -12.164136905), (8.601411599, -11.092566099))
            ThreePointArc((8.601411599, -11.092566099), (6.817380703, -11.387110791), (6, -13))
            Line((6, -13), (6, -20.164136905))
            ThreePointArc((6, -20.164136905), (6.817380703, -21.777026114), (8.601411599, -22.071570807))
            Line((8.601411599, -22.071570807), (12, -21))
        make_face()
        with BuildLine():
            Line((-12, -12.164136905), (-12, -13))
            Line((-12, -13), (-12, -20.164136905))
            Line((-12, -20.164136905), (-12, -21))
            Line((-12, -21), (-8.601411599, -22.071570807))
            ThreePointArc((-8.601411599, -22.071570807), (-6.817380703, -21.777026114), (-6, -20.164136905))
            Line((-6, -20.164136905), (-6, -13))
            ThreePointArc((-6, -13), (-6.817380703, -11.387110791), (-8.601411599, -11.092566099))
            Line((-8.601411599, -11.092566099), (-12, -12.164136905))
        make_face()
    extrude(amount=-CUT_EXTRUDE3_DEPTH, mode=Mode.SUBTRACT)

    # Chamfer4
    chamfer4_edges = [part.edges().sort_by_distance(p)[0] for p in [
        (12, -44.643511809, 46),
    ]]
    chamfer(chamfer4_edges, length=CHAMFER4_SIZE)

    # Chamfer5
    chamfer5_edges = [part.edges().sort_by_distance(p)[0] for p in [
        (11.829629131, -20.830260427, 62),
        (7.830127019, -13.562177826, 62),
        (0, -5, 62),
        (12, -30.66447361, 62),
        (-7.830127019, -13.562177826, 62),
        (-11.829629131, -20.830260427, 62),
        (-12, -30.66447361, 62),
    ]]
    chamfer(chamfer5_edges, length=CHAMFER5_SIZE)

    # Chamfer7
    chamfer7_edges = [part.edges().sort_by_distance(p)[0] for p in [
        (-12, -44.643511809, 46),
    ]]
    chamfer(chamfer7_edges, length=CHAMFER7_SIZE)

    # Chamfer10
    # the kernel refuses this chamfer: 3 mm, written as the material it takes off along each edge
    with BuildSketch(Plane(origin=(-12, -82.255306543, 30), x_dir=(0.9996219169112968, 0, 0.02749587661058678), z_dir=(0, 1, 0))) as chamfer10_piece_1_section:
        Polygon((CHAMFER10_SIZE * 0.999621916911, CHAMFER10_SIZE * 0.0274958766106), (-CHAMFER10_SIZE * 0.0274958766106, CHAMFER10_SIZE * 0.999621916911), (0, 0), align=None)
    chamfer10_piece_1 = extrude(amount=26.087650492, mode=Mode.PRIVATE)
    chamfer10_piece_1 = chamfer10_piece_1 - Plane(origin=(0, 0, 28.957588125), x_dir=(0, -1, 0), z_dir=(0, 0, -1)) * Cylinder(65, 65, mode=Mode.PRIVATE)
    add(chamfer10_piece_1, mode=Mode.SUBTRACT)
    with BuildSketch(Plane(origin=(-12, -91.715048964, 30), x_dir=(0.9996219169112968, 0, 0.02749587661058678), z_dir=(0, 1, 0)), Plane(origin=(12, -69.86233176, 30), x_dir=(-0.9996219169112968, 0, 0.02749587661058678), z_dir=(0, -1, 0))) as chamfer10_piece_2:
        Polygon((CHAMFER10_SIZE * 0.999621916911, CHAMFER10_SIZE * 0.0274958766106), (-CHAMFER10_SIZE * 0.0274958766106, CHAMFER10_SIZE * 0.999621916911), (0, 0), align=None)
    extrude(amount=21.852717204, mode=Mode.SUBTRACT)
    with BuildSketch(Plane(origin=(12, -56.167656051, 30), x_dir=(-0.9996219169112968, 0, 0.02749587661058678), z_dir=(0, -1, 0))) as chamfer10_piece_3_section:
        Polygon((CHAMFER10_SIZE * 0.999621916911, CHAMFER10_SIZE * 0.0274958766106), (-CHAMFER10_SIZE * 0.0274958766106, CHAMFER10_SIZE * 0.999621916911), (0, 0), align=None)
    chamfer10_piece_3 = extrude(amount=26.087650492, mode=Mode.PRIVATE)
    chamfer10_piece_3 = chamfer10_piece_3 - Plane(origin=(0, 0, 28.982814192), x_dir=(0, -1, 0), z_dir=(0, 0, -1)) * Cylinder(65, 65, mode=Mode.PRIVATE)
    add(chamfer10_piece_3, mode=Mode.SUBTRACT)


solid = part.part
